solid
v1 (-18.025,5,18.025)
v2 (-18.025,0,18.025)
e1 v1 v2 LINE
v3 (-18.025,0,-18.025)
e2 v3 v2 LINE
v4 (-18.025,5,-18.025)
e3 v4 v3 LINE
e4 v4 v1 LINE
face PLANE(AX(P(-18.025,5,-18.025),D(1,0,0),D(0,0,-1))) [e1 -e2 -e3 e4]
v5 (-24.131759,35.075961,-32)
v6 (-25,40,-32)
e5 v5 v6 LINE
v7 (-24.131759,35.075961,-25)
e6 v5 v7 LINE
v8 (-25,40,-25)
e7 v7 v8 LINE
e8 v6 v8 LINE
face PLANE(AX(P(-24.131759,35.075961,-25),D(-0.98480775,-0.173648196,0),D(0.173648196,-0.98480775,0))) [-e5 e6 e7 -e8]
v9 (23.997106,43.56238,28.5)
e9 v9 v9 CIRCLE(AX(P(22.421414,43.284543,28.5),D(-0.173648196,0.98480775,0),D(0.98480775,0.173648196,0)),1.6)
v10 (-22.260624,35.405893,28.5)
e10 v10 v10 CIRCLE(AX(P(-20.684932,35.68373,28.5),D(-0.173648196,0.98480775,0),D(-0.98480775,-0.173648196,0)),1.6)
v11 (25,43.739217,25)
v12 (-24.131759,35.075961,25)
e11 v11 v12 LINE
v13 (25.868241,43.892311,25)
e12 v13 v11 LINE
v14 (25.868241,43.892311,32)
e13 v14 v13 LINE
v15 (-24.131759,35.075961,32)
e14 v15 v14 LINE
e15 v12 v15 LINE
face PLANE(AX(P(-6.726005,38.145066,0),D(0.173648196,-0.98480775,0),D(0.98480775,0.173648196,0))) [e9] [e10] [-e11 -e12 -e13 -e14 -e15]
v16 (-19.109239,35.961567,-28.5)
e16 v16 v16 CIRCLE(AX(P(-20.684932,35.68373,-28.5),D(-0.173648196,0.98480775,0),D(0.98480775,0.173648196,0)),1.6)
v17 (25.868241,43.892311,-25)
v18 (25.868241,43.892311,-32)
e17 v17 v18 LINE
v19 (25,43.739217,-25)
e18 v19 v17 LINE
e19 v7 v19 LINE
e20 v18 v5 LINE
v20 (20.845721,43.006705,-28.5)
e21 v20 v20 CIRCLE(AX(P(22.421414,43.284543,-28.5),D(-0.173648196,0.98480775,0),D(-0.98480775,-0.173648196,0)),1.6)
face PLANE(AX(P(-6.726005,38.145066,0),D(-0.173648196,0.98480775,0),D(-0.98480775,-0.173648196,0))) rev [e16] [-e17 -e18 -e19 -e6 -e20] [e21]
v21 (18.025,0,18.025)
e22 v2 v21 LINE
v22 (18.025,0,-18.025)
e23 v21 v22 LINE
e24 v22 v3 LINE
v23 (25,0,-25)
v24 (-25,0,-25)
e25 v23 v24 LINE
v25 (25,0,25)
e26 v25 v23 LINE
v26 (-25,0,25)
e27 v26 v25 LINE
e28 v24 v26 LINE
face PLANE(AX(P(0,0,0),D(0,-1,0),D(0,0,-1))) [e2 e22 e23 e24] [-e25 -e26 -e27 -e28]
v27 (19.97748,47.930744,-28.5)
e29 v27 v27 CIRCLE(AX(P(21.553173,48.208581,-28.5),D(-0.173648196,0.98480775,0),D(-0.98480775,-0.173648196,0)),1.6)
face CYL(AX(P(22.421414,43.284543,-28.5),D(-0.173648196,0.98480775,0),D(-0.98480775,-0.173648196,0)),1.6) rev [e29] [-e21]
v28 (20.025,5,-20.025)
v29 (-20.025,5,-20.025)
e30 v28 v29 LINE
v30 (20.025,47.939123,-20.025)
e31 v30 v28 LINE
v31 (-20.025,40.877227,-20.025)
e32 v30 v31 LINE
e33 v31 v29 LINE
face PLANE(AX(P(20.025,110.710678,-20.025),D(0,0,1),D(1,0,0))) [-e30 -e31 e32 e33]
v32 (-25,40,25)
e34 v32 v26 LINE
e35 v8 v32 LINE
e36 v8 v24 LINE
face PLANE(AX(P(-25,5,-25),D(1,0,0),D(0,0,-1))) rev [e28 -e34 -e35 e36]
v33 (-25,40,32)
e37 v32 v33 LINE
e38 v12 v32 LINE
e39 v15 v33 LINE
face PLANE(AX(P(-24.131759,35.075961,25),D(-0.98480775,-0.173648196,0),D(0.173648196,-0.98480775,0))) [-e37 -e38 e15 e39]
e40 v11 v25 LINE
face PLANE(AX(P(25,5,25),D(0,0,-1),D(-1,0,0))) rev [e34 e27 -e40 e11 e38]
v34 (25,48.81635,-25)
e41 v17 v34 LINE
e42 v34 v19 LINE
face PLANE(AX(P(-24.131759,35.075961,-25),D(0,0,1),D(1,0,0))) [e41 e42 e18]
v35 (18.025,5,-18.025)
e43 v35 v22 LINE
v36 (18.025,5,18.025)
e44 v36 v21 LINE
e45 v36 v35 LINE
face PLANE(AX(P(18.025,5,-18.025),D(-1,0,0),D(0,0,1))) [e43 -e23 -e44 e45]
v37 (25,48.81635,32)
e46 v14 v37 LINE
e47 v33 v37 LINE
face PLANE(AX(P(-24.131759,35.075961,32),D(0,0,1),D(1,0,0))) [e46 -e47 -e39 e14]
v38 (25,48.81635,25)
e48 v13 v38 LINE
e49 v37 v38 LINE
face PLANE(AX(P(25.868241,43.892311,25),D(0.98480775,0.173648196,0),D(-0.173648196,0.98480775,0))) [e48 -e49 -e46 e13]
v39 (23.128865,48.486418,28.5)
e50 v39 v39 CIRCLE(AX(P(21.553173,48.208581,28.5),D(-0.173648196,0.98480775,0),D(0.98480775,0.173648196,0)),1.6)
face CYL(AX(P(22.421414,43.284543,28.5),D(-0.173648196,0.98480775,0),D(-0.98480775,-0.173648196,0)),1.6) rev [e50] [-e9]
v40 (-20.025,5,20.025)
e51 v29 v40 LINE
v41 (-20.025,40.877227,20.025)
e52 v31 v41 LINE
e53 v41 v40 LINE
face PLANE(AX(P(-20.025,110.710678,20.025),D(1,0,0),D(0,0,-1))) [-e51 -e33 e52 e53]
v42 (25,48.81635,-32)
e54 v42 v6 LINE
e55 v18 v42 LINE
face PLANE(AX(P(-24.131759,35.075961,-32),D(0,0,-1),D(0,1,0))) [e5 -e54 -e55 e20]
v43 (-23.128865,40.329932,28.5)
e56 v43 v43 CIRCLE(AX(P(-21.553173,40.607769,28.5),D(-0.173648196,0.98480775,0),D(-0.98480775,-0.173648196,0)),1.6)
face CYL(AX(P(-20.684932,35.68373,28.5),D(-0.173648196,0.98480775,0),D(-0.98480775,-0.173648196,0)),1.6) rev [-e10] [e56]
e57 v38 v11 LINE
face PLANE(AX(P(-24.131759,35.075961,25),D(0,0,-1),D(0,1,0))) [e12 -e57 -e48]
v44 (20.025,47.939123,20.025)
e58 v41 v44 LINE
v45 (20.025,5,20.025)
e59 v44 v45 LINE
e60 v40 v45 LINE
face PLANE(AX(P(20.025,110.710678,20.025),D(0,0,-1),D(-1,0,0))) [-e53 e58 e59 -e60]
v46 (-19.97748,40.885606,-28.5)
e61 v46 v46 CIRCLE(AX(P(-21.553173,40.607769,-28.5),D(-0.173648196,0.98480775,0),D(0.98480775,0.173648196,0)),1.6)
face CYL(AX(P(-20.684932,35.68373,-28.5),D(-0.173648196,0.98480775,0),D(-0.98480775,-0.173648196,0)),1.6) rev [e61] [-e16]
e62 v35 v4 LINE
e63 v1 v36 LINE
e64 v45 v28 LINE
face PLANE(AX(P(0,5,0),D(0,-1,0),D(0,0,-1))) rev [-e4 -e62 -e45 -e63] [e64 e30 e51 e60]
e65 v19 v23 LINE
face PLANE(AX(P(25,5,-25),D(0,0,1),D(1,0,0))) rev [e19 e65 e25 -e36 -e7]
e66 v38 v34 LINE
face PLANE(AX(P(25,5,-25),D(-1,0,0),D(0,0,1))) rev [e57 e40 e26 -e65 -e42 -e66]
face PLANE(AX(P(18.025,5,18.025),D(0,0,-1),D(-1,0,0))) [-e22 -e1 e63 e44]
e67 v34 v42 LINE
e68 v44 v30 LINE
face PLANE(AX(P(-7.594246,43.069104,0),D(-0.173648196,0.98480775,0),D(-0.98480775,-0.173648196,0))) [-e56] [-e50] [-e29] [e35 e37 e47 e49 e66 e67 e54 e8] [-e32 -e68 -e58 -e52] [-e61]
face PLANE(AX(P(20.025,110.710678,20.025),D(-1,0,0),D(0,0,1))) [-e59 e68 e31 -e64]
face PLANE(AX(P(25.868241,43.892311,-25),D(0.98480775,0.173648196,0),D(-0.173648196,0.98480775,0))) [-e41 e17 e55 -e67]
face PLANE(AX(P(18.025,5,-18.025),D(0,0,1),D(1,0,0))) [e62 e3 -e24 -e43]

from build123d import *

# Parameters (mm, degrees)
SKETCH2_W             = 50
SKETCH2_H             = 50
SKETCH2_W_2           = 36.05
SKETCH2_H_2           = 36.05
BOSS_EXTRUDE2_DEPTH   = 5
SKETCH1_W             = 50
SKETCH1_H             = 50
SKETCH1_W_2           = 40.05
SKETCH1_H_2           = 40.05
BOSS_EXTRUDE4_DEPTH   = 40
BOSS_EXTRUDE5_START   = -25
BOSS_EXTRUDE5_DEPTH   = 50
BOSS_EXTRUDE5_2_DEPTH = 4.975
BOSS_EXTRUDE5_START_2 = 20.025
BOSS_EXTRUDE5_3_DEPTH = 4.975
SKETCH7_W             = 50.771330761
SKETCH7_H             = 7
BOSS_EXTRUDE6_DEPTH   = 5
SKETCH8_R             = 1.6
CUT_EXTRUDE1_DEPTH    = 5


# Read off the part's stored shape, not the designer's step: Boss-Extrude5
with BuildPart() as part:
    # Sketch2 → Boss-Extrude2 (new body)
    with BuildSketch(Plane(origin=(0, 0, 0), x_dir=(1, 0, 0), z_dir=(0, 1, 0))):
        Rectangle(SKETCH2_W, SKETCH2_H)
        Rectangle(SKETCH2_W_2, SKETCH2_H_2, mode=Mode.SUBTRACT)
    extrude(amount=BOSS_EXTRUDE2_DEPTH)

    # Sketch1 → Boss-Extrude4 (add)
    with BuildSketch(Plane(origin=(0, 0, 0), x_dir=(1, 0, 0), z_dir=(0, 1, 0))):
        Rectangle(SKETCH1_W, SKETCH1_H)
        Rectangle(SKETCH1_W_2, SKETCH1_H_2, mode=Mode.SUBTRACT)
    extrude(amount=BOSS_EXTRUDE4_DEPTH)

    # Boss-Extrude5 outline → Boss-Extrude5 (add)
    with BuildSketch(Plane.XY.offset(BOSS_EXTRUDE5_START)):
        Polygon((25, 40), (25, 48.81635), (20.025, 47.939123175), (20.025, 40), align=None)
        Polygon((-20.025, 40), (-20.025, 40.877226825), (-25, 40), align=None)
    extrude(amount=BOSS_EXTRUDE5_DEPTH)

    # Boss-Extrude5 2 outline → Boss-Extrude5 2 (add)
    with BuildSketch(Plane.XY.offset(BOSS_EXTRUDE5_START)):
        Polygon((20.025, 40), (20.025, 47.939123175), (-20.025, 40.877226825), (-20.025, 40), align=None)
    extrude(amount=BOSS_EXTRUDE5_2_DEPTH)

    # Boss-Extrude5 3 outline → Boss-Extrude5 3 (add)
    with BuildSketch(Plane.XY.offset(BOSS_EXTRUDE5_START_2)):
        Polygon((20.025, 40), (20.025, 47.939123175), (-20.025, 40.877226825), (-20.025, 40), align=None)
    extrude(amount=BOSS_EXTRUDE5_3_DEPTH)

    # Sketch7 → Boss-Extrude6 (add)
    with BuildSketch(Plane(origin=(-7.59424597, 43.069104391, 0), x_dir=(0.984807749763281, 0.17364819609251012, 0), z_dir=(-0.17364819609251012, 0.984807749763281, 0))):
        with Locations((7.71139948, 28.5)):
            Rectangle(SKETCH7_W, SKETCH7_H)
        with Locations((7.71139948, -28.5)):
            Rectangle(SKETCH7_W, SKETCH7_H)
    extrude(amount=-BOSS_EXTRUDE6_DEPTH)

    # Sketch8 → Cut-Extrude1 (cut)
    with BuildSketch(Plane(origin=(-7.59424597, 43.069104391, 0), x_dir=(0.984807749763281, 0.17364819609251012, 0), z_dir=(-0.17364819609251012, 0.984807749763281, 0))):
        with Locations(Location((-14.1742659, -28.5, 0), (0, 0, 180))):
            Circle(SKETCH8_R)
        with Locations((29.597064861, -28.5)):
            Circle(SKETCH8_R)
        with Locations(Location((29.597064861, 28.5, 0), (0, 0, 180))):
            Circle(SKETCH8_R)
        with Locations((-14.1742659, 28.5)):
            Circle(SKETCH8_R)
    extrude(amount=-CUT_EXTRUDE1_DEPTH, mode=Mode.SUBTRACT)


solid = part.part
